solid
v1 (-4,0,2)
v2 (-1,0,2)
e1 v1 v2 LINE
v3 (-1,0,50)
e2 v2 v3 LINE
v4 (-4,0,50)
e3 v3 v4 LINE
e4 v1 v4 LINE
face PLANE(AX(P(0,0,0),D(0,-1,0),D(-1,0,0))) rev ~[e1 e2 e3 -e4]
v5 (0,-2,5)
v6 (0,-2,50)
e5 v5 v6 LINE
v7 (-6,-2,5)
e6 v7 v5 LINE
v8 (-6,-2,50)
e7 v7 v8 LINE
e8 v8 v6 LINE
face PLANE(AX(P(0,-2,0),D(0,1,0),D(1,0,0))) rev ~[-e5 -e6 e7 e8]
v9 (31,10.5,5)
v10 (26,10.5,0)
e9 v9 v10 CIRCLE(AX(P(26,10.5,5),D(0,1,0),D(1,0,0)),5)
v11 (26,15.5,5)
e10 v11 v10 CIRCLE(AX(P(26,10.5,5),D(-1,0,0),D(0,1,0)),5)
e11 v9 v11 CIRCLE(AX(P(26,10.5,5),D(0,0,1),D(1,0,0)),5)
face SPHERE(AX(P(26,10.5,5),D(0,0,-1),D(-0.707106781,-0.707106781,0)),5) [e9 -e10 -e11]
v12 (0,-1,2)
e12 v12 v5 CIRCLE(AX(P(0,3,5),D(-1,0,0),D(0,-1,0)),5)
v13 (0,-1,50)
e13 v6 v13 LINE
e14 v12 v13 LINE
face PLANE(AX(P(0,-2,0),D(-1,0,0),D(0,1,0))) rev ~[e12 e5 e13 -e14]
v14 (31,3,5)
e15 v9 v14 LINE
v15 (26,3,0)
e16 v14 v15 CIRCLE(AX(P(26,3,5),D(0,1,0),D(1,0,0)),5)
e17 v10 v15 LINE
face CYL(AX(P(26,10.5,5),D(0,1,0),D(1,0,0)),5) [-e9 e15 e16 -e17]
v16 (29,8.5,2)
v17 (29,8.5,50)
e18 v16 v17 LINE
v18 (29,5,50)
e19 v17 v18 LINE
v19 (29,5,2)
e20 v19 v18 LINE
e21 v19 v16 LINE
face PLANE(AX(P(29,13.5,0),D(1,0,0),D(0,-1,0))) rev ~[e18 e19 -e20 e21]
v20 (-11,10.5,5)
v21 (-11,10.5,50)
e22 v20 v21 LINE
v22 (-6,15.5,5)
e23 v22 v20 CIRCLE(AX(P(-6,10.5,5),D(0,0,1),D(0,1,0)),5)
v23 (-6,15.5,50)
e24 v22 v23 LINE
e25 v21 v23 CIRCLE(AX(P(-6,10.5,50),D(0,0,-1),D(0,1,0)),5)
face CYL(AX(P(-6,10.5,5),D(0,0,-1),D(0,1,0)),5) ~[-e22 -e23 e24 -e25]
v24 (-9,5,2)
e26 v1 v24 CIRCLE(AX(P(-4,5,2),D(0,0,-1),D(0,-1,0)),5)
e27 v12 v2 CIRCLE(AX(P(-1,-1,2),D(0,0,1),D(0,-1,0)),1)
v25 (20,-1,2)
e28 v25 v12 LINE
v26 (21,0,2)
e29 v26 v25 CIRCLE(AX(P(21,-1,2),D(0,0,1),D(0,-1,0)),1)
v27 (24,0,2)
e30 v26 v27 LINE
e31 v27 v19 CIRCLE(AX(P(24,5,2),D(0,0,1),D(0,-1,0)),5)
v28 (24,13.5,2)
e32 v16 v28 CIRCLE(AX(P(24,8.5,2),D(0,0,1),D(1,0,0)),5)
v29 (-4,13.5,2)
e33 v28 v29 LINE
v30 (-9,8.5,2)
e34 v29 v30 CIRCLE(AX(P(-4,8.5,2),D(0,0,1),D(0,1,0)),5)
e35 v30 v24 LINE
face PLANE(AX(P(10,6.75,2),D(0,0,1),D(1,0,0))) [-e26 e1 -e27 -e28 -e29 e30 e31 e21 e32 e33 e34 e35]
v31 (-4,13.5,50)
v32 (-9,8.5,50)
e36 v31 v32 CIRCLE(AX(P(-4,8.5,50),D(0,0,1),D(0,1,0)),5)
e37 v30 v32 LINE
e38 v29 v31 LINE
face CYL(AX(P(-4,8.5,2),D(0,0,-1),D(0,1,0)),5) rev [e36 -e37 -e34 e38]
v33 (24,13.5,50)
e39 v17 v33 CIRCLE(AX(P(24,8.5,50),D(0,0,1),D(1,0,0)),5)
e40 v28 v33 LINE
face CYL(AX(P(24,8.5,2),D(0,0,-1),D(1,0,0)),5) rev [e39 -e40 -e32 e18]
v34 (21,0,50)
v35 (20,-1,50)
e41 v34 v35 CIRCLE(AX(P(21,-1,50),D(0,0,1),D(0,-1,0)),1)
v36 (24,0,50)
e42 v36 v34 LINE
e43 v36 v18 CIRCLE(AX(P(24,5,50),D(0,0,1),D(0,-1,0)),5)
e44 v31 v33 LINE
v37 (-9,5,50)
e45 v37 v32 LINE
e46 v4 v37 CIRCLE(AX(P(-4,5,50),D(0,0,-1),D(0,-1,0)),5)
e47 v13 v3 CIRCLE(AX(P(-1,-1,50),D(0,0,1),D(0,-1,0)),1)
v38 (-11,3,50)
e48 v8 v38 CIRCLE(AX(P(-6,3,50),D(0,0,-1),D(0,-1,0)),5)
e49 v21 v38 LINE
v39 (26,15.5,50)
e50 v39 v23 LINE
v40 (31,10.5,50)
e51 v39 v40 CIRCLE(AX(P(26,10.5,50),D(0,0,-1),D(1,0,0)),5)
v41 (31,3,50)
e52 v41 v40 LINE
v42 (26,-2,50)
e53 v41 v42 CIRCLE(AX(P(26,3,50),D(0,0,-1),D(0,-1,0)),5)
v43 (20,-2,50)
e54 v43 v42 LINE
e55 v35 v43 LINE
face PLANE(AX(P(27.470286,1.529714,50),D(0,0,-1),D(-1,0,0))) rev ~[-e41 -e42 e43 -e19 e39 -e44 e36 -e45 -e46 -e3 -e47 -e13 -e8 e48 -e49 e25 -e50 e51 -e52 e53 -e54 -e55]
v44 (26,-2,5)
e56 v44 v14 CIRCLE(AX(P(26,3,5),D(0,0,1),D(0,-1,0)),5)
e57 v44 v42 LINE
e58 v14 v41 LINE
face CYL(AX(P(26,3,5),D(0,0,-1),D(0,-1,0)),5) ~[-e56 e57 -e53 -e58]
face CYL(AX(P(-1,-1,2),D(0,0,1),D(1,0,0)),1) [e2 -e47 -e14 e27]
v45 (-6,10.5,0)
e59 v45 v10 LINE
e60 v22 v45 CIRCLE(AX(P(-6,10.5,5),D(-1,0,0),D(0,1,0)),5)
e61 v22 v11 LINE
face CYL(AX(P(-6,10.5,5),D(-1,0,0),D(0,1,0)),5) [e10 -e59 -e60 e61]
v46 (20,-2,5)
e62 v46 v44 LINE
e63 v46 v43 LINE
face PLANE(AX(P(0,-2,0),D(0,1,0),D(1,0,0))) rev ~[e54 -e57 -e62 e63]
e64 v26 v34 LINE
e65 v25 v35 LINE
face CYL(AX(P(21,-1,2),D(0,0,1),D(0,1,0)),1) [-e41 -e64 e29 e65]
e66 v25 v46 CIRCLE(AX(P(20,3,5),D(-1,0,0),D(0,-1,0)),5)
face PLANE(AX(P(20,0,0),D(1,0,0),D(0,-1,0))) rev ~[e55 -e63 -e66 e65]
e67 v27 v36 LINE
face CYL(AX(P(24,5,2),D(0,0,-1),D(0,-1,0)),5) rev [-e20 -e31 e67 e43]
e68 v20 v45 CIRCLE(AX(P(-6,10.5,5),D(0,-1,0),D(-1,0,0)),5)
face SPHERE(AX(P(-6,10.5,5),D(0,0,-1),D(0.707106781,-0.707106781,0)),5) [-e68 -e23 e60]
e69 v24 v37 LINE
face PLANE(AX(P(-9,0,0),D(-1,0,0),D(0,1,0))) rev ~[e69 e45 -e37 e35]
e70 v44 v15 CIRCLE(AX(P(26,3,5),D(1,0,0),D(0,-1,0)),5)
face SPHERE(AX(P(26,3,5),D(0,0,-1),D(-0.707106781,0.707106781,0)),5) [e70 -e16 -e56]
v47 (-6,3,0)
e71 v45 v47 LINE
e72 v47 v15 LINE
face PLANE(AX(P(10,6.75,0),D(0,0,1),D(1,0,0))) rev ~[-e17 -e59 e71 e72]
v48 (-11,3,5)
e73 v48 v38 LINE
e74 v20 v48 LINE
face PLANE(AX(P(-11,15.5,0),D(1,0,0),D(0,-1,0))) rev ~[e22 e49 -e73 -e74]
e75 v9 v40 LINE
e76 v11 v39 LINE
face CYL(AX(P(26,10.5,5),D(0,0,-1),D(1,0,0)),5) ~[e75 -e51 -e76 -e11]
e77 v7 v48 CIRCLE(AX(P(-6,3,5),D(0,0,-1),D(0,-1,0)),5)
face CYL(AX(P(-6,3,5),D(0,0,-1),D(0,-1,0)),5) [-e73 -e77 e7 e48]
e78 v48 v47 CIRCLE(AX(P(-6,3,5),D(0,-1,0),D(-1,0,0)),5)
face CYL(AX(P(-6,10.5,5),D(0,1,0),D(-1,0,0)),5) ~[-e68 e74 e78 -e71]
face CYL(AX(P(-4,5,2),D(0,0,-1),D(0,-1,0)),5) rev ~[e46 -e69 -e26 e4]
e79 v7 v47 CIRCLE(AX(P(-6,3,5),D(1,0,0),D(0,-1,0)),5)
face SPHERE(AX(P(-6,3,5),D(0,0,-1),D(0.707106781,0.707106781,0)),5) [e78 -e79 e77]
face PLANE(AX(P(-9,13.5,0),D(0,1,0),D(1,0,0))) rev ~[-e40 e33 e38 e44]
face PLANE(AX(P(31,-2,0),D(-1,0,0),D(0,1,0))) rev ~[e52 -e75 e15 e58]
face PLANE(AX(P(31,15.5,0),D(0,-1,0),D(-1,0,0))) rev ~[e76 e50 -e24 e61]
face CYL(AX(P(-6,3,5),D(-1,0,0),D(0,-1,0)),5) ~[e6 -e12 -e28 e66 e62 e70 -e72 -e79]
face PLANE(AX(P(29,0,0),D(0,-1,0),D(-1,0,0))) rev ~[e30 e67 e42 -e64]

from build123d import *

# Parameters (mm, degrees)
F1_DEPTH     = 50
F0_W         = 20
F0_H         = 2
F2_DEPTH     = 2
F3_T1_DEPTH  = 48
F3_T3_DEPTH  = 57.5
F3_T5_DEPTH  = 32
F3_T7_DEPTH  = 7.5
F3_S11_W     = 5
F3_S11_H     = 5
F3_T12_DEPTH = 5
F3_S17_W     = 5
F3_S17_H     = 5
F3_T18_DEPTH = 5
F3_S23_W     = 5
F3_S23_H     = 5
F3_T24_DEPTH = 5
F3_S29_W     = 5
F3_S29_H     = 5
F3_T30_DEPTH = 5
F4_R         = 1


# Not quite as in the source:
# - a fillet or chamfer that OpenCascade refuses, or shapes differently, is made with other operations: its cross-section is extruded or revolved along the edge and cut away or added


with BuildPart() as f1:
    # F0 (on Top) → F1 (new body)
    with BuildSketch(Plane.XY):
        Polygon((0, 0), (-9, 0), (-9, 13.5), (29, 13.5), (29, 0), (20, 0), (20, -2), (31, -2), (31, 15.5), (-11, 15.5), (-11, -2), (0, -2), align=None)
    extrude(amount=F1_DEPTH)

    # F0 (on Top) → F2 (join)
    with BuildSketch(Plane.XY):
        Polygon((-9, 13.5), (-9, 0), (0, 0), (20, 0), (29, 0), (29, 13.5), align=None)
        with Locations((10, -1)):
            Rectangle(F0_W, F0_H)
    extrude(amount=F2_DEPTH)

    # F3: fillet of radius 5 on 12 edges, made by hand

    # F3_s2 → F3_t1 (join)
    with BuildSketch(Plane.XY.offset(2)):
        with BuildLine():
            ThreePointArc((24, 0), (27.5355339059, 1.4644660941), (29, 5))
            Line((29, 5), (29, 0))
            Line((29, 0), (24, 0))
        make_face()
        with BuildLine():
            ThreePointArc((29, 8.5), (27.5355339059, 12.0355339059), (24, 13.5))
            Line((24, 13.5), (29, 13.5))
            Line((29, 13.5), (29, 8.5))
        make_face()
        with BuildLine():
            ThreePointArc((-4, 0), (-7.5355339059, 1.4644660941), (-9, 5))
            Line((-9, 5), (-9, 0))
            Line((-9, 0), (-4, 0))
        make_face()
        with BuildLine():
            ThreePointArc((-4, 13.5), (-7.5355339059, 12.0355339059), (-9, 8.5))
            Line((-9, 8.5), (-9, 13.5))
            Line((-9, 13.5), (-4, 13.5))
        make_face()
    extrude(amount=F3_T1_DEPTH)

    # F3_s4 → F3_t3 (cut)
    with BuildSketch(Plane.XY.offset(5)):
        with BuildLine():
            ThreePointArc((-6, 15.5), (-9.5355339059, 14.0355339059), (-11, 10.5))
            Line((-11, 10.5), (-11, 15.5))
            Line((-11, 15.5), (-6, 15.5))
        make_face()
        with BuildLine():
            ThreePointArc((-6, -2), (-9.5355339059, -0.5355339059), (-11, 3))
            Line((-11, 3), (-11, -2))
            Line((-11, -2), (-6, -2))
        make_face()
        with BuildLine():
            ThreePointArc((31, 10.5), (29.5355339059, 14.0355339059), (26, 15.5))
            Line((26, 15.5), (31, 15.5))
            Line((31, 15.5), (31, 10.5))
        make_face()
        with BuildLine():
            ThreePointArc((26, -2), (29.5355339059, -0.5355339059), (31, 3))
            Line((31, 3), (31, -2))
            Line((31, -2), (26, -2))
        make_face()
    extrude(amount=F3_T3_DEPTH, mode=Mode.SUBTRACT)

    # F3_s6 → F3_t5 (cut)
    with BuildSketch(Plane.YZ.offset(-6)):
        with BuildLine():
            ThreePointArc((-2, 5), (-0.5355339059, 1.4644660941), (3, 0))
            Line((3, 0), (-2, 0))
            Line((-2, 0), (-2, 5))
        make_face()
        with BuildLine():
            ThreePointArc((15.5, 5), (14.0355339059, 1.4644660941), (10.5, 0))
            Line((10.5, 0), (15.5, 0))
            Line((15.5, 0), (15.5, 5))
        make_face()
    extrude(amount=F3_T5_DEPTH, mode=Mode.SUBTRACT)

    # F3_s8 → F3_t7 (cut)
    with BuildSketch(Plane.XZ.offset(-10.5)):
        with BuildLine():
            ThreePointArc((31, 5), (29.5355339059, 1.4644660941), (26, 0))
            Line((26, 0), (31, 0))
            Line((31, 0), (31, 5))
        make_face()
        with BuildLine():
            ThreePointArc((-11, 5), (-9.5355339059, 1.4644660941), (-6, 0))
            Line((-6, 0), (-11, 0))
            Line((-11, 0), (-11, 5))
        make_face()
    extrude(amount=F3_T7_DEPTH, mode=Mode.SUBTRACT)


with BuildPart() as f3_tool10:
    # F3_s11 → F3_t12 (new body)
    with BuildSketch(Plane.XY.offset(5)):
        with Locations((-8.5, 13)):
            Rectangle(F3_S11_W, F3_S11_H)
    extrude(amount=-F3_T12_DEPTH)

    # F3_s13 → F3_t14 (revolve, cut)
    with BuildSketch(Plane(origin=(-6, 10.5, 5), x_dir=(0.7071067812, -0.7071067812, 0), z_dir=(0.7071067812, 0.7071067812, 0))):
        with BuildLine():
            ThreePointArc((0, -5), (5, 0), (0, 5))
            Line((0, 5), (0, -5))
        make_face()
    revolve(axis=Axis((-6, 10.5, 5), (0, 0, -1)), mode=Mode.SUBTRACT)


with BuildPart() as f1_1:
    add(f1.part)

    # F3_t9: cut F3_tool10
    add(f3_tool10.part, mode=Mode.SUBTRACT)


with BuildPart() as f3_tool16:
    # F3_s17 → F3_t18 (new body)
    with BuildSketch(Plane.XY.offset(5)):
        with Locations((-8.5, 0.5)):
            Rectangle(F3_S17_W, F3_S17_H)
    extrude(amount=-F3_T18_DEPTH)

    # F3_s19 → F3_t20 (revolve, cut)
    with BuildSketch(Plane(origin=(-6, 3, 5), x_dir=(0.7071067812, 0.7071067812, 0), z_dir=(-0.7071067812, 0.7071067812, 0))):
        with BuildLine():
            ThreePointArc((0, -5), (5, 0), (0, 5))
            Line((0, 5), (0, -5))
        make_face()
    revolve(axis=Axis((-6, 3, 5), (0, 0, -1)), mode=Mode.SUBTRACT)


with BuildPart() as f1_2:
    add(f1_1.part)

    # F3_t15: cut F3_tool16
    add(f3_tool16.part, mode=Mode.SUBTRACT)


with BuildPart() as f3_tool22:
    # F3_s23 → F3_t24 (new body)
    with BuildSketch(Plane.XY.offset(5)):
        with Locations((28.5, 13)):
            Rectangle(F3_S23_W, F3_S23_H)
    extrude(amount=-F3_T24_DEPTH)

    # F3_s25 → F3_t26 (revolve, cut)
    with BuildSketch(Plane(origin=(26, 10.5, 5), x_dir=(-0.7071067812, -0.7071067812, 0), z_dir=(0.7071067812, -0.7071067812, 0))):
        with BuildLine():
            ThreePointArc((0, -5), (5, 0), (0, 5))
            Line((0, 5), (0, -5))
        make_face()
    revolve(axis=Axis((26, 10.5, 5), (0, 0, -1)), mode=Mode.SUBTRACT)


with BuildPart() as f1_3:
    add(f1_2.part)

    # F3_t21: cut F3_tool22
    add(f3_tool22.part, mode=Mode.SUBTRACT)


with BuildPart() as f3_tool28:
    # F3_s29 → F3_t30 (new body)
    with BuildSketch(Plane.XY.offset(5)):
        with Locations((28.5, 0.5)):
            Rectangle(F3_S29_W, F3_S29_H)
    extrude(amount=-F3_T30_DEPTH)

    # F3_s31 → F3_t32 (revolve, cut)
    with BuildSketch(Plane(origin=(26, 3, 5), x_dir=(-0.7071067812, 0.7071067812, 0), z_dir=(-0.7071067812, -0.7071067812, 0))):
        with BuildLine():
            ThreePointArc((0, -5), (5, 0), (0, 5))
            Line((0, 5), (0, -5))
        make_face()
    revolve(axis=Axis((26, 3, 5), (0, 0, -1)), mode=Mode.SUBTRACT)


with BuildPart() as f1_4:
    add(f1_3.part)

    # F3_t27: cut F3_tool28
    add(f3_tool28.part, mode=Mode.SUBTRACT)

    # F4
    f4_edges = [f1_4.edges().sort_by_distance(p)[0] for p in [
        (0, 0, 26),
        (20, 0, 26),
    ]]
    fillet(f4_edges, radius=F4_R)


solid = f1_4.part
